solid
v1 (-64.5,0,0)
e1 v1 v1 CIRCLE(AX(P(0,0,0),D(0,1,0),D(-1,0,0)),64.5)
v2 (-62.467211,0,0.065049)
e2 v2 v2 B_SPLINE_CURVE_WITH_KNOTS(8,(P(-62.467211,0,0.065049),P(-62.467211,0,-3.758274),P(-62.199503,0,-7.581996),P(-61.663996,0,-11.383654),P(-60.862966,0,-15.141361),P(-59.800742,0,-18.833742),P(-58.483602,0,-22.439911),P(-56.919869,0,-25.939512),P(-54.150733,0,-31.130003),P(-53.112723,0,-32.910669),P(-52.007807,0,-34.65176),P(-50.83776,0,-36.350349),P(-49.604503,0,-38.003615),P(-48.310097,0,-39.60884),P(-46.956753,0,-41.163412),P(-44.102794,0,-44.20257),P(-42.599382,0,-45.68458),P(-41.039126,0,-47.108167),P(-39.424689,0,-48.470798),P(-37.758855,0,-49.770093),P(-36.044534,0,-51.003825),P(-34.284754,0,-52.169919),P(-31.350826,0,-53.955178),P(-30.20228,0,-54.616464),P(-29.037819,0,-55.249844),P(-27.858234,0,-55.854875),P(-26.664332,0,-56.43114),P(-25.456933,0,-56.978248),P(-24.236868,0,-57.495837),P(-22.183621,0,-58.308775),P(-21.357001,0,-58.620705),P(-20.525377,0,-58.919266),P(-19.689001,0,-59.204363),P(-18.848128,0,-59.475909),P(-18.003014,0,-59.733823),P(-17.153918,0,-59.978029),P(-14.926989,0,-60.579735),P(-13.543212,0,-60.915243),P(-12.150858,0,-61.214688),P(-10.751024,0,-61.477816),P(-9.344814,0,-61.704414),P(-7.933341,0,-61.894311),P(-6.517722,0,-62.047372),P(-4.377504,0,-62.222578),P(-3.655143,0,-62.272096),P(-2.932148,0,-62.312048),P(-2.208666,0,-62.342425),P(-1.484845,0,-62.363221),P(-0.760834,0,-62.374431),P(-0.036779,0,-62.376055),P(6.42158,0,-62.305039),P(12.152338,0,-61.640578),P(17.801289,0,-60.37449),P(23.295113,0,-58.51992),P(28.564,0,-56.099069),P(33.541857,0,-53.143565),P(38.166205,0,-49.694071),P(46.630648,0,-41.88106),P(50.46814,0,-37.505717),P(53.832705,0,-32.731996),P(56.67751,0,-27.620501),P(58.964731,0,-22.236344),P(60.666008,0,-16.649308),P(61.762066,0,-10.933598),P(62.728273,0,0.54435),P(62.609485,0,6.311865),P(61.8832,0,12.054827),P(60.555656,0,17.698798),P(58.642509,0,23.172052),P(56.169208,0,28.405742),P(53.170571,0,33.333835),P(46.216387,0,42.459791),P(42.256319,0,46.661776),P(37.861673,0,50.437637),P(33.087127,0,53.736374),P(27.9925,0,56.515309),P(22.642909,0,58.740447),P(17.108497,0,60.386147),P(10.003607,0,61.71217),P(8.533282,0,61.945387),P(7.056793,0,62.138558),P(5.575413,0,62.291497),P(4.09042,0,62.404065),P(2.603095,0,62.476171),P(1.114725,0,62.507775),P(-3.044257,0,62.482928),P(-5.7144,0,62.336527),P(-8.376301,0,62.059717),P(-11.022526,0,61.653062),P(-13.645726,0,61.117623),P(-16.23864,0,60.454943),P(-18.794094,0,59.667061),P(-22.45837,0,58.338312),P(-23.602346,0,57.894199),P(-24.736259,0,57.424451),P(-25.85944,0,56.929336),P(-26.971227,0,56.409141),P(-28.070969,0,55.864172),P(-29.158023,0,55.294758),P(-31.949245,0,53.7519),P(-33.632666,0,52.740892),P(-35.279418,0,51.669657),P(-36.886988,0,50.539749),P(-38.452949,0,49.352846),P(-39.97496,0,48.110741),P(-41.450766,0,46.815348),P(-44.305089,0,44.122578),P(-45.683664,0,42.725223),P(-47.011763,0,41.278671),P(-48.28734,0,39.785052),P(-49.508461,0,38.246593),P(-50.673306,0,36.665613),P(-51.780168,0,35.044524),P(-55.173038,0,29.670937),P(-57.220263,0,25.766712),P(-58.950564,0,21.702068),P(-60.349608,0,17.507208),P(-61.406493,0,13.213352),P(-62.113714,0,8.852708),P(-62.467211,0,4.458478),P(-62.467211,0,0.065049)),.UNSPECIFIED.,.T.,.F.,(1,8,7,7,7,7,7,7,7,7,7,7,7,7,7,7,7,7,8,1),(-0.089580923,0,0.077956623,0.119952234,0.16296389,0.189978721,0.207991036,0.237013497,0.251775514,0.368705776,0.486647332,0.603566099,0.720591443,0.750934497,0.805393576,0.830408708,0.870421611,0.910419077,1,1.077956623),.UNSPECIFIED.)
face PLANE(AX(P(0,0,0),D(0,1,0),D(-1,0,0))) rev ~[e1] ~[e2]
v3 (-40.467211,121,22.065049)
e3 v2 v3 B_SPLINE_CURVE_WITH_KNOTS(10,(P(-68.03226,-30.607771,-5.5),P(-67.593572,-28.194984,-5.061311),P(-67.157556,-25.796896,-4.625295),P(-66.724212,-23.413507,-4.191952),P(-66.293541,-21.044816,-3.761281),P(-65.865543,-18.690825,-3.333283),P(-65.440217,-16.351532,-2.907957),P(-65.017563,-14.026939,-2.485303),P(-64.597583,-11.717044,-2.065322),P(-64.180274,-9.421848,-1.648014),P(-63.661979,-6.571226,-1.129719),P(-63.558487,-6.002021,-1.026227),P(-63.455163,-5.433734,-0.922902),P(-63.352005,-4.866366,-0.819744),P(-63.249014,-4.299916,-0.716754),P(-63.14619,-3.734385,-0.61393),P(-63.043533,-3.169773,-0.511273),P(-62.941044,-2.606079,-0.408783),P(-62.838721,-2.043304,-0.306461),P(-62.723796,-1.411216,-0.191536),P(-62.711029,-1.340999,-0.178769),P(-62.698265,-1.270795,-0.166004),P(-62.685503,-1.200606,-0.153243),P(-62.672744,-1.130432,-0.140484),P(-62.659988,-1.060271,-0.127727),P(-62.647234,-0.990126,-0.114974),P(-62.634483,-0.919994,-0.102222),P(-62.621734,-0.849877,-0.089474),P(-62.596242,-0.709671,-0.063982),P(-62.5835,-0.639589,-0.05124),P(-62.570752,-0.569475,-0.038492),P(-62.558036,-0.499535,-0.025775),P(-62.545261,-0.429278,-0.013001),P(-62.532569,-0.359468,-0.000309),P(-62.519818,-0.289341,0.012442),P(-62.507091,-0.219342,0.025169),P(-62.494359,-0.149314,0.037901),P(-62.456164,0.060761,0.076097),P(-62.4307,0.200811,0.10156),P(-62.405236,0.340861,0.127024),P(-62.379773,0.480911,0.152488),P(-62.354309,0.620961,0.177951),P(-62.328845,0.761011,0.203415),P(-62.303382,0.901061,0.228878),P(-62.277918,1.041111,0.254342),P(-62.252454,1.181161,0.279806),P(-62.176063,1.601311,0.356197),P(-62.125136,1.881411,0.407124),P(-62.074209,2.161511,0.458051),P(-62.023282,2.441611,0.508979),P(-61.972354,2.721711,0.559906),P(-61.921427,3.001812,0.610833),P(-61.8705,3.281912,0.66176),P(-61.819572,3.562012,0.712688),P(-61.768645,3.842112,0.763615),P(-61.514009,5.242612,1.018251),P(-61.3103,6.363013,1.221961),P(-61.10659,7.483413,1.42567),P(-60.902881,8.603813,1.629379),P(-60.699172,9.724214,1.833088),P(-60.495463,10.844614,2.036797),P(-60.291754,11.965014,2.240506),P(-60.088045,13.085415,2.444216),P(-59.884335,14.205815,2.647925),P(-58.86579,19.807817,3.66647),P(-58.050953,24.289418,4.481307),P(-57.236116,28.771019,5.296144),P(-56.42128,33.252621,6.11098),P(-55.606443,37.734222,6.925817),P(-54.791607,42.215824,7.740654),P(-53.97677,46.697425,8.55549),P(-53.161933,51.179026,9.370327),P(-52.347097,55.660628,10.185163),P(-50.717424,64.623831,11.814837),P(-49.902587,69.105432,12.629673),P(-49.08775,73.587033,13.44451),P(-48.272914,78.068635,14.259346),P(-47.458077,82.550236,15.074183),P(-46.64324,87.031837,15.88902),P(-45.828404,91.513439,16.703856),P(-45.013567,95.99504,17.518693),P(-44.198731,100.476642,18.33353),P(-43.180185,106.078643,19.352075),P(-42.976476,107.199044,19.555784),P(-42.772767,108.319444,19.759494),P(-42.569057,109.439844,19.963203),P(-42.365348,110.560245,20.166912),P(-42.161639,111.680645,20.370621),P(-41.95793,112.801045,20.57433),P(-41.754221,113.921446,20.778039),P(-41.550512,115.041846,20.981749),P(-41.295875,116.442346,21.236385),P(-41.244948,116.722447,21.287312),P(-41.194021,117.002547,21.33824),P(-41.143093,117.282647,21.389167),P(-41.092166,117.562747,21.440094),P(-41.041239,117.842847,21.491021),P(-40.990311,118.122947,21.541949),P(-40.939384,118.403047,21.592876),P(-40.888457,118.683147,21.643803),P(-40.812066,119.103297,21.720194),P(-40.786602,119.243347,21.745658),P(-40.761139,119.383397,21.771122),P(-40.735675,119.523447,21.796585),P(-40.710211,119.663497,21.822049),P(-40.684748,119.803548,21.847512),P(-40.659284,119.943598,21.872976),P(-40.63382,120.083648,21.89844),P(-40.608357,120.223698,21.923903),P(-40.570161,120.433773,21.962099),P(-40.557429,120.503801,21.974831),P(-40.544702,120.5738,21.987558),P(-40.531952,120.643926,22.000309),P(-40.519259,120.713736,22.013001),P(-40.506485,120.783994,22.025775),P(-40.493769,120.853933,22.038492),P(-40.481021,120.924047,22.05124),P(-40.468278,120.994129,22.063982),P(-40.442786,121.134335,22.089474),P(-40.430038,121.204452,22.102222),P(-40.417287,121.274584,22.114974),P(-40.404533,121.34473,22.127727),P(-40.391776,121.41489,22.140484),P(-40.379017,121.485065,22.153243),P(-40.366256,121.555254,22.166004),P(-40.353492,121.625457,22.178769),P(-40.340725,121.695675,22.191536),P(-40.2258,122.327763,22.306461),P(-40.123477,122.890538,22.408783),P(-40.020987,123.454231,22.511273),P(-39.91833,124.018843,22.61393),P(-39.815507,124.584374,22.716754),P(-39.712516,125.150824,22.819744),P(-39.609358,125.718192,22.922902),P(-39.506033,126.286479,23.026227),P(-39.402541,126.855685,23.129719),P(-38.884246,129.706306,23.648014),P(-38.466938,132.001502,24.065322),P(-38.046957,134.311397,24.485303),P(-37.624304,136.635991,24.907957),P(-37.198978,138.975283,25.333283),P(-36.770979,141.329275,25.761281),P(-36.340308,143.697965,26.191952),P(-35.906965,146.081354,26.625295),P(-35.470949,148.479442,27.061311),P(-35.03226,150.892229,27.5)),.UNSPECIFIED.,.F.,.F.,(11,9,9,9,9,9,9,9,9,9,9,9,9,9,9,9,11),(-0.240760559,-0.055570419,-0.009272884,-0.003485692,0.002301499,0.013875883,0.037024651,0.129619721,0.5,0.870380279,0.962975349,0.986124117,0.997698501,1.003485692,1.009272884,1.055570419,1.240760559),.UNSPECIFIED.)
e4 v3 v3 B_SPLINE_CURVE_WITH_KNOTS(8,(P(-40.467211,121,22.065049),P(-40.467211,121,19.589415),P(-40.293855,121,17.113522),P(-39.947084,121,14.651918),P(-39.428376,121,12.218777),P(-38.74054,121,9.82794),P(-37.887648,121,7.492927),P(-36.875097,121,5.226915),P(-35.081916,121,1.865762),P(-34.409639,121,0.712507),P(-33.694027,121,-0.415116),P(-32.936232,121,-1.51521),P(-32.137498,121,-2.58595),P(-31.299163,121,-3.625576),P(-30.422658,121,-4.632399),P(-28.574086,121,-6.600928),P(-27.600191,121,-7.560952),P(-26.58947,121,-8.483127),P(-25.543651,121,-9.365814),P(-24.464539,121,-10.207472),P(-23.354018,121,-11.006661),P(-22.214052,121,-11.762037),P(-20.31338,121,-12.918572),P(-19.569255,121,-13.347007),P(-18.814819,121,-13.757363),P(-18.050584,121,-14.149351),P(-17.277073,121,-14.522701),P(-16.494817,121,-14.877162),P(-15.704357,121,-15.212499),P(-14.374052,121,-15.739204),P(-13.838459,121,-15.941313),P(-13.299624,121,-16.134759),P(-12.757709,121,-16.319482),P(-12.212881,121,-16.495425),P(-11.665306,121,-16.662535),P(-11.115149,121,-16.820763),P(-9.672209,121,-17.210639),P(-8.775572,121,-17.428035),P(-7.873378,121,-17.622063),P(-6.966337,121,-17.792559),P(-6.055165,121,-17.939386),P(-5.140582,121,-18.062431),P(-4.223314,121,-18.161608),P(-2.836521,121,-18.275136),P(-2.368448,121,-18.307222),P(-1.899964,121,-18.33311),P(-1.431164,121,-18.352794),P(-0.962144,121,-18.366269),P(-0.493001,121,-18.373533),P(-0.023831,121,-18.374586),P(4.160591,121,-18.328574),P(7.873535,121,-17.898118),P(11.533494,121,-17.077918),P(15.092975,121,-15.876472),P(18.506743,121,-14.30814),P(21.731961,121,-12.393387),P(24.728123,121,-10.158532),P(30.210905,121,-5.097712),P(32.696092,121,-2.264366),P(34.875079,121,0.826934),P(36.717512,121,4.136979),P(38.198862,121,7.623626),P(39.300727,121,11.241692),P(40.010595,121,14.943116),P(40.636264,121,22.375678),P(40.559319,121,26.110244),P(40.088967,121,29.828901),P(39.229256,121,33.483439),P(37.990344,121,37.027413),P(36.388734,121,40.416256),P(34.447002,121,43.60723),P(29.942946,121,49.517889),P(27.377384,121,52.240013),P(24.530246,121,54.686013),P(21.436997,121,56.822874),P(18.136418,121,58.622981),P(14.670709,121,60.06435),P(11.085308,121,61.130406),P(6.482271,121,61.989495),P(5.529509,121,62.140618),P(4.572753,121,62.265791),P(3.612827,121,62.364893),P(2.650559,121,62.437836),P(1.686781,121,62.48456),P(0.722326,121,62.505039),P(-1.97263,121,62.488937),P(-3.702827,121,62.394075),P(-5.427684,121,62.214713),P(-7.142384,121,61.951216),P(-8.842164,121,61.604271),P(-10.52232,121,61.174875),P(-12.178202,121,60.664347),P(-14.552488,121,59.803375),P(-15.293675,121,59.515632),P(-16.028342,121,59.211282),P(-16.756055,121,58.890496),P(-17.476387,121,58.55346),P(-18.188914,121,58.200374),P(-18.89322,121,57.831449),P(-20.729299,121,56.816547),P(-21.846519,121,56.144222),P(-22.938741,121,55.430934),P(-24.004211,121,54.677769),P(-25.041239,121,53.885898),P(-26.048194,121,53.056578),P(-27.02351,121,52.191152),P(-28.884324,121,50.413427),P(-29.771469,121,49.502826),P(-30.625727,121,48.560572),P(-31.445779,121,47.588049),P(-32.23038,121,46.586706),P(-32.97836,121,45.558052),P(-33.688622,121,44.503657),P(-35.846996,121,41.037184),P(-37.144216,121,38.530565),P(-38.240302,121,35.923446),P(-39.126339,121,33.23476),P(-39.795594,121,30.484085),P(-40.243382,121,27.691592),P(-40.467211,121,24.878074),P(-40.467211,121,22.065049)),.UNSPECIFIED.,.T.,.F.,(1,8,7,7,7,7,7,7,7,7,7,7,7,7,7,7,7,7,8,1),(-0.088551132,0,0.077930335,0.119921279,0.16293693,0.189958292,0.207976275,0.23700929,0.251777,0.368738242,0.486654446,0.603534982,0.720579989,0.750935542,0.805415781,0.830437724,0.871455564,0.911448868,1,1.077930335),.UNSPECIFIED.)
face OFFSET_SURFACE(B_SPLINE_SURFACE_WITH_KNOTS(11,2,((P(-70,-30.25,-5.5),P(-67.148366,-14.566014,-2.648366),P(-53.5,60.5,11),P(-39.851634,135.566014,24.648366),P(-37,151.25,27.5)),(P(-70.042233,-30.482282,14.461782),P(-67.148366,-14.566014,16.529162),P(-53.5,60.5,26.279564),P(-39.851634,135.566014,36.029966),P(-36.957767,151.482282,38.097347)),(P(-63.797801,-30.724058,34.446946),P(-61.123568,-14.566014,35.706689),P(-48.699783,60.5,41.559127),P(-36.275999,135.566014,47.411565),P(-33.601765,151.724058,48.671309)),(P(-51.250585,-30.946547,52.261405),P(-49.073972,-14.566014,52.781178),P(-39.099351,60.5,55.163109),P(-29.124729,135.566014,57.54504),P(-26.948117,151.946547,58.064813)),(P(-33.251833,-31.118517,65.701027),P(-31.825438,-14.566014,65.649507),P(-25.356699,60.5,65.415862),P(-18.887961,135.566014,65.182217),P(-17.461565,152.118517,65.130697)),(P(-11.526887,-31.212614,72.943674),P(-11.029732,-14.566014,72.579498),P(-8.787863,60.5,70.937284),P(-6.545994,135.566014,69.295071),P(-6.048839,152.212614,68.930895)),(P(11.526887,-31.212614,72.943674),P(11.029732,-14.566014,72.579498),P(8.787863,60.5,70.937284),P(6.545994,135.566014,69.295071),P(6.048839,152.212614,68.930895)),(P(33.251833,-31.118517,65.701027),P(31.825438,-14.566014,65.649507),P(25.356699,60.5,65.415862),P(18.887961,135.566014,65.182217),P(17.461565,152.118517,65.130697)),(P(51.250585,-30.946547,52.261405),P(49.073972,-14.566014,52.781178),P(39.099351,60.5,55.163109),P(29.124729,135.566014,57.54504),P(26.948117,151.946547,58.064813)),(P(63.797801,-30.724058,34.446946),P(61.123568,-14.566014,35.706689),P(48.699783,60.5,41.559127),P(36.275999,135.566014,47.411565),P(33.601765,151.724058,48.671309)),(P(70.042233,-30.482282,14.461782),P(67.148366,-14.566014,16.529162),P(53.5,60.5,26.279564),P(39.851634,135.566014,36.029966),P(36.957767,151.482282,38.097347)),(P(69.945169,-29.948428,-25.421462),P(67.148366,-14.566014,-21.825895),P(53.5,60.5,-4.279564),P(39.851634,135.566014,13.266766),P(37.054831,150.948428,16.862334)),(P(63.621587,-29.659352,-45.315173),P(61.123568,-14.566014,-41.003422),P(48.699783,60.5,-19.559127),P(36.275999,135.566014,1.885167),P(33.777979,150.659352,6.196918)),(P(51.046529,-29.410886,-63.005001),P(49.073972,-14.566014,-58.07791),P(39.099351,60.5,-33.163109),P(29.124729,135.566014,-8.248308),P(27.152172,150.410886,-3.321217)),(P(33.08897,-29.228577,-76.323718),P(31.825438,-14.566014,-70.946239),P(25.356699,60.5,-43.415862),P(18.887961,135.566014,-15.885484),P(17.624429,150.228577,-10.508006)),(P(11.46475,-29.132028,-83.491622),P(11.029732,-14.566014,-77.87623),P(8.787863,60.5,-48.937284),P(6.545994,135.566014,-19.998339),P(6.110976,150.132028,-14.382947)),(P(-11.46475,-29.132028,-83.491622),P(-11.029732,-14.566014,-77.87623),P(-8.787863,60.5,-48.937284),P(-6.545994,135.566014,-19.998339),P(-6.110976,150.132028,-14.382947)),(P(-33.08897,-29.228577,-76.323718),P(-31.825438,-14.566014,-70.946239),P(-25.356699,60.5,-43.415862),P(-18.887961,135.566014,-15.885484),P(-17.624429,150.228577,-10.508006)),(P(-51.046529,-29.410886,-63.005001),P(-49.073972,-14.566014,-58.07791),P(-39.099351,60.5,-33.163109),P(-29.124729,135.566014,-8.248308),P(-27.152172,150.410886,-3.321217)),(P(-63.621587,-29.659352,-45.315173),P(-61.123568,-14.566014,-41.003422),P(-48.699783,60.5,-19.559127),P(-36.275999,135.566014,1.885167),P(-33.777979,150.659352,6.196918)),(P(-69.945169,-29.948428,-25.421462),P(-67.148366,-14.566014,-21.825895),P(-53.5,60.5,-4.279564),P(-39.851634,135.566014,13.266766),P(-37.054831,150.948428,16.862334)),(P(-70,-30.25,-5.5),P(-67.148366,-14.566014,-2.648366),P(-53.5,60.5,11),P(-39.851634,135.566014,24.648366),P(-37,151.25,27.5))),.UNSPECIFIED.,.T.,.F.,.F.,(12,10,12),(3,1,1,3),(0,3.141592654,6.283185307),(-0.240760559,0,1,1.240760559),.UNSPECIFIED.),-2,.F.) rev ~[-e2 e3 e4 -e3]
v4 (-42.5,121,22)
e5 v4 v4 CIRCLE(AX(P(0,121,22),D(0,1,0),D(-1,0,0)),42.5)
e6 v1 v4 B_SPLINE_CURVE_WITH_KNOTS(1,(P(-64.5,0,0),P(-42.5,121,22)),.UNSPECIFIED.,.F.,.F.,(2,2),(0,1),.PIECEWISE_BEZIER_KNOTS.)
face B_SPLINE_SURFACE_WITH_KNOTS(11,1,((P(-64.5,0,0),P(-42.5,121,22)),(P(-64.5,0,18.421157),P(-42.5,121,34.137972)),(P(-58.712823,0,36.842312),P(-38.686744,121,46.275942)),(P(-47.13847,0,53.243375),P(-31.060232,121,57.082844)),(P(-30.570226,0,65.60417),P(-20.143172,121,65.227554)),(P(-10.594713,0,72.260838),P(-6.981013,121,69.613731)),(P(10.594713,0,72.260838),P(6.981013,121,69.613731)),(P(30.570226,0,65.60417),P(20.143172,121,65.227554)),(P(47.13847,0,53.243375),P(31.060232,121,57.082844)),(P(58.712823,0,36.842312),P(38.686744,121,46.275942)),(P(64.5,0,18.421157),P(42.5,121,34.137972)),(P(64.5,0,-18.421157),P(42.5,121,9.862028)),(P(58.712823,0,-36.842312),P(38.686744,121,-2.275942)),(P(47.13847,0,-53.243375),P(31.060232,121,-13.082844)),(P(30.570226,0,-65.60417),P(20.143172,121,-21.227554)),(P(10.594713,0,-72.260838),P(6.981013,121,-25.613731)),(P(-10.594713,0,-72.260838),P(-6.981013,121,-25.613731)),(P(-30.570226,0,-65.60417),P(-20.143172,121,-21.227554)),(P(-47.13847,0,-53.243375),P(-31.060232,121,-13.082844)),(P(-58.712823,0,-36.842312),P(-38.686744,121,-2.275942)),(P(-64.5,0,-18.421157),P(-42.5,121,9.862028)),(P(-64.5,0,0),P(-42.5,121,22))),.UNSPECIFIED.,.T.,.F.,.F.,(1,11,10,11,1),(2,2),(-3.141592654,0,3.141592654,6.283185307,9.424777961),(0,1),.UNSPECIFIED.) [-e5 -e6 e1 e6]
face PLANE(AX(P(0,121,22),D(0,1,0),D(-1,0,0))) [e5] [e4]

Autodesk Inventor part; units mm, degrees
ref_plane "YZ Plane" through (0, 0, 0) normal (1, 0, 0) x (0, 1, 0)
ref_plane "XY Plane" through (0, 0, 0) normal (0, 0, 1) x (1, 0, 0)
sketch "Szkic6" plane through (0, 0, 0) normal (0, 1, 0) x (-1, 0, 0)
  circle A0 centre (0, 0) radius 64.5
  dimension "d33" = 129
ref_plane "Płaszczyzna konstrukcyjna1" through (0, 121, 0) normal (0, 1, 0) x (-1, 0, 0)
sketch "Szkic7" plane through (0, 121, 0) normal (0, 1, 0) x (-1, 0, 0)
  circle A0 centre (0, 22) radius 42.5
  line L0 (0, -20.3) -> (0, 20.3) construction
  circle A1 centre (0, 0) radius 64.5 construction
  dimension "d35" = 85
loft "Wyciągnięcie złożone1" add profiles "Szkic6", "Szkic7"
shell "Skorupa1" thickness 2 removed faces 2 at (-9.753, 121, 13.2609) at (-10.0865, 0, -16.1433)
equation "\"d33\" = OD1"
equation "\"d35\" = OD2"
equation "\"d52\" = THK"
equation "\"SzerokośćGięciaPodcięcia\" = Grubość"
equation "\"RozmiarPodcięciaNarożnika\" = 4 * Grubość"
equation "\"PromieńPrzejścia\" = PromieńGięcia"
equation "\"Rozmiar_promienia_Jacobiego\" = PromieńGięcia"
equation "\"Wielk_odstępu\" = Grubość"
equation "\"d2\" = PromieńGięcia"
equation "\"d23\" = PromieńGięcia"
equation "\"OD1\" = 129"
equation "\"OD2\" = 85"
equation "\"L\" = 121"
equation "\"THK\" = 2"
equation "\"d34\" = L"
equation "\"Grubość\" = 1.5"
equation "\"PromieńGięcia\" = 3"
properties part number "Redukcja asymetryczna Ø129x85x2 L=121" material "304"
